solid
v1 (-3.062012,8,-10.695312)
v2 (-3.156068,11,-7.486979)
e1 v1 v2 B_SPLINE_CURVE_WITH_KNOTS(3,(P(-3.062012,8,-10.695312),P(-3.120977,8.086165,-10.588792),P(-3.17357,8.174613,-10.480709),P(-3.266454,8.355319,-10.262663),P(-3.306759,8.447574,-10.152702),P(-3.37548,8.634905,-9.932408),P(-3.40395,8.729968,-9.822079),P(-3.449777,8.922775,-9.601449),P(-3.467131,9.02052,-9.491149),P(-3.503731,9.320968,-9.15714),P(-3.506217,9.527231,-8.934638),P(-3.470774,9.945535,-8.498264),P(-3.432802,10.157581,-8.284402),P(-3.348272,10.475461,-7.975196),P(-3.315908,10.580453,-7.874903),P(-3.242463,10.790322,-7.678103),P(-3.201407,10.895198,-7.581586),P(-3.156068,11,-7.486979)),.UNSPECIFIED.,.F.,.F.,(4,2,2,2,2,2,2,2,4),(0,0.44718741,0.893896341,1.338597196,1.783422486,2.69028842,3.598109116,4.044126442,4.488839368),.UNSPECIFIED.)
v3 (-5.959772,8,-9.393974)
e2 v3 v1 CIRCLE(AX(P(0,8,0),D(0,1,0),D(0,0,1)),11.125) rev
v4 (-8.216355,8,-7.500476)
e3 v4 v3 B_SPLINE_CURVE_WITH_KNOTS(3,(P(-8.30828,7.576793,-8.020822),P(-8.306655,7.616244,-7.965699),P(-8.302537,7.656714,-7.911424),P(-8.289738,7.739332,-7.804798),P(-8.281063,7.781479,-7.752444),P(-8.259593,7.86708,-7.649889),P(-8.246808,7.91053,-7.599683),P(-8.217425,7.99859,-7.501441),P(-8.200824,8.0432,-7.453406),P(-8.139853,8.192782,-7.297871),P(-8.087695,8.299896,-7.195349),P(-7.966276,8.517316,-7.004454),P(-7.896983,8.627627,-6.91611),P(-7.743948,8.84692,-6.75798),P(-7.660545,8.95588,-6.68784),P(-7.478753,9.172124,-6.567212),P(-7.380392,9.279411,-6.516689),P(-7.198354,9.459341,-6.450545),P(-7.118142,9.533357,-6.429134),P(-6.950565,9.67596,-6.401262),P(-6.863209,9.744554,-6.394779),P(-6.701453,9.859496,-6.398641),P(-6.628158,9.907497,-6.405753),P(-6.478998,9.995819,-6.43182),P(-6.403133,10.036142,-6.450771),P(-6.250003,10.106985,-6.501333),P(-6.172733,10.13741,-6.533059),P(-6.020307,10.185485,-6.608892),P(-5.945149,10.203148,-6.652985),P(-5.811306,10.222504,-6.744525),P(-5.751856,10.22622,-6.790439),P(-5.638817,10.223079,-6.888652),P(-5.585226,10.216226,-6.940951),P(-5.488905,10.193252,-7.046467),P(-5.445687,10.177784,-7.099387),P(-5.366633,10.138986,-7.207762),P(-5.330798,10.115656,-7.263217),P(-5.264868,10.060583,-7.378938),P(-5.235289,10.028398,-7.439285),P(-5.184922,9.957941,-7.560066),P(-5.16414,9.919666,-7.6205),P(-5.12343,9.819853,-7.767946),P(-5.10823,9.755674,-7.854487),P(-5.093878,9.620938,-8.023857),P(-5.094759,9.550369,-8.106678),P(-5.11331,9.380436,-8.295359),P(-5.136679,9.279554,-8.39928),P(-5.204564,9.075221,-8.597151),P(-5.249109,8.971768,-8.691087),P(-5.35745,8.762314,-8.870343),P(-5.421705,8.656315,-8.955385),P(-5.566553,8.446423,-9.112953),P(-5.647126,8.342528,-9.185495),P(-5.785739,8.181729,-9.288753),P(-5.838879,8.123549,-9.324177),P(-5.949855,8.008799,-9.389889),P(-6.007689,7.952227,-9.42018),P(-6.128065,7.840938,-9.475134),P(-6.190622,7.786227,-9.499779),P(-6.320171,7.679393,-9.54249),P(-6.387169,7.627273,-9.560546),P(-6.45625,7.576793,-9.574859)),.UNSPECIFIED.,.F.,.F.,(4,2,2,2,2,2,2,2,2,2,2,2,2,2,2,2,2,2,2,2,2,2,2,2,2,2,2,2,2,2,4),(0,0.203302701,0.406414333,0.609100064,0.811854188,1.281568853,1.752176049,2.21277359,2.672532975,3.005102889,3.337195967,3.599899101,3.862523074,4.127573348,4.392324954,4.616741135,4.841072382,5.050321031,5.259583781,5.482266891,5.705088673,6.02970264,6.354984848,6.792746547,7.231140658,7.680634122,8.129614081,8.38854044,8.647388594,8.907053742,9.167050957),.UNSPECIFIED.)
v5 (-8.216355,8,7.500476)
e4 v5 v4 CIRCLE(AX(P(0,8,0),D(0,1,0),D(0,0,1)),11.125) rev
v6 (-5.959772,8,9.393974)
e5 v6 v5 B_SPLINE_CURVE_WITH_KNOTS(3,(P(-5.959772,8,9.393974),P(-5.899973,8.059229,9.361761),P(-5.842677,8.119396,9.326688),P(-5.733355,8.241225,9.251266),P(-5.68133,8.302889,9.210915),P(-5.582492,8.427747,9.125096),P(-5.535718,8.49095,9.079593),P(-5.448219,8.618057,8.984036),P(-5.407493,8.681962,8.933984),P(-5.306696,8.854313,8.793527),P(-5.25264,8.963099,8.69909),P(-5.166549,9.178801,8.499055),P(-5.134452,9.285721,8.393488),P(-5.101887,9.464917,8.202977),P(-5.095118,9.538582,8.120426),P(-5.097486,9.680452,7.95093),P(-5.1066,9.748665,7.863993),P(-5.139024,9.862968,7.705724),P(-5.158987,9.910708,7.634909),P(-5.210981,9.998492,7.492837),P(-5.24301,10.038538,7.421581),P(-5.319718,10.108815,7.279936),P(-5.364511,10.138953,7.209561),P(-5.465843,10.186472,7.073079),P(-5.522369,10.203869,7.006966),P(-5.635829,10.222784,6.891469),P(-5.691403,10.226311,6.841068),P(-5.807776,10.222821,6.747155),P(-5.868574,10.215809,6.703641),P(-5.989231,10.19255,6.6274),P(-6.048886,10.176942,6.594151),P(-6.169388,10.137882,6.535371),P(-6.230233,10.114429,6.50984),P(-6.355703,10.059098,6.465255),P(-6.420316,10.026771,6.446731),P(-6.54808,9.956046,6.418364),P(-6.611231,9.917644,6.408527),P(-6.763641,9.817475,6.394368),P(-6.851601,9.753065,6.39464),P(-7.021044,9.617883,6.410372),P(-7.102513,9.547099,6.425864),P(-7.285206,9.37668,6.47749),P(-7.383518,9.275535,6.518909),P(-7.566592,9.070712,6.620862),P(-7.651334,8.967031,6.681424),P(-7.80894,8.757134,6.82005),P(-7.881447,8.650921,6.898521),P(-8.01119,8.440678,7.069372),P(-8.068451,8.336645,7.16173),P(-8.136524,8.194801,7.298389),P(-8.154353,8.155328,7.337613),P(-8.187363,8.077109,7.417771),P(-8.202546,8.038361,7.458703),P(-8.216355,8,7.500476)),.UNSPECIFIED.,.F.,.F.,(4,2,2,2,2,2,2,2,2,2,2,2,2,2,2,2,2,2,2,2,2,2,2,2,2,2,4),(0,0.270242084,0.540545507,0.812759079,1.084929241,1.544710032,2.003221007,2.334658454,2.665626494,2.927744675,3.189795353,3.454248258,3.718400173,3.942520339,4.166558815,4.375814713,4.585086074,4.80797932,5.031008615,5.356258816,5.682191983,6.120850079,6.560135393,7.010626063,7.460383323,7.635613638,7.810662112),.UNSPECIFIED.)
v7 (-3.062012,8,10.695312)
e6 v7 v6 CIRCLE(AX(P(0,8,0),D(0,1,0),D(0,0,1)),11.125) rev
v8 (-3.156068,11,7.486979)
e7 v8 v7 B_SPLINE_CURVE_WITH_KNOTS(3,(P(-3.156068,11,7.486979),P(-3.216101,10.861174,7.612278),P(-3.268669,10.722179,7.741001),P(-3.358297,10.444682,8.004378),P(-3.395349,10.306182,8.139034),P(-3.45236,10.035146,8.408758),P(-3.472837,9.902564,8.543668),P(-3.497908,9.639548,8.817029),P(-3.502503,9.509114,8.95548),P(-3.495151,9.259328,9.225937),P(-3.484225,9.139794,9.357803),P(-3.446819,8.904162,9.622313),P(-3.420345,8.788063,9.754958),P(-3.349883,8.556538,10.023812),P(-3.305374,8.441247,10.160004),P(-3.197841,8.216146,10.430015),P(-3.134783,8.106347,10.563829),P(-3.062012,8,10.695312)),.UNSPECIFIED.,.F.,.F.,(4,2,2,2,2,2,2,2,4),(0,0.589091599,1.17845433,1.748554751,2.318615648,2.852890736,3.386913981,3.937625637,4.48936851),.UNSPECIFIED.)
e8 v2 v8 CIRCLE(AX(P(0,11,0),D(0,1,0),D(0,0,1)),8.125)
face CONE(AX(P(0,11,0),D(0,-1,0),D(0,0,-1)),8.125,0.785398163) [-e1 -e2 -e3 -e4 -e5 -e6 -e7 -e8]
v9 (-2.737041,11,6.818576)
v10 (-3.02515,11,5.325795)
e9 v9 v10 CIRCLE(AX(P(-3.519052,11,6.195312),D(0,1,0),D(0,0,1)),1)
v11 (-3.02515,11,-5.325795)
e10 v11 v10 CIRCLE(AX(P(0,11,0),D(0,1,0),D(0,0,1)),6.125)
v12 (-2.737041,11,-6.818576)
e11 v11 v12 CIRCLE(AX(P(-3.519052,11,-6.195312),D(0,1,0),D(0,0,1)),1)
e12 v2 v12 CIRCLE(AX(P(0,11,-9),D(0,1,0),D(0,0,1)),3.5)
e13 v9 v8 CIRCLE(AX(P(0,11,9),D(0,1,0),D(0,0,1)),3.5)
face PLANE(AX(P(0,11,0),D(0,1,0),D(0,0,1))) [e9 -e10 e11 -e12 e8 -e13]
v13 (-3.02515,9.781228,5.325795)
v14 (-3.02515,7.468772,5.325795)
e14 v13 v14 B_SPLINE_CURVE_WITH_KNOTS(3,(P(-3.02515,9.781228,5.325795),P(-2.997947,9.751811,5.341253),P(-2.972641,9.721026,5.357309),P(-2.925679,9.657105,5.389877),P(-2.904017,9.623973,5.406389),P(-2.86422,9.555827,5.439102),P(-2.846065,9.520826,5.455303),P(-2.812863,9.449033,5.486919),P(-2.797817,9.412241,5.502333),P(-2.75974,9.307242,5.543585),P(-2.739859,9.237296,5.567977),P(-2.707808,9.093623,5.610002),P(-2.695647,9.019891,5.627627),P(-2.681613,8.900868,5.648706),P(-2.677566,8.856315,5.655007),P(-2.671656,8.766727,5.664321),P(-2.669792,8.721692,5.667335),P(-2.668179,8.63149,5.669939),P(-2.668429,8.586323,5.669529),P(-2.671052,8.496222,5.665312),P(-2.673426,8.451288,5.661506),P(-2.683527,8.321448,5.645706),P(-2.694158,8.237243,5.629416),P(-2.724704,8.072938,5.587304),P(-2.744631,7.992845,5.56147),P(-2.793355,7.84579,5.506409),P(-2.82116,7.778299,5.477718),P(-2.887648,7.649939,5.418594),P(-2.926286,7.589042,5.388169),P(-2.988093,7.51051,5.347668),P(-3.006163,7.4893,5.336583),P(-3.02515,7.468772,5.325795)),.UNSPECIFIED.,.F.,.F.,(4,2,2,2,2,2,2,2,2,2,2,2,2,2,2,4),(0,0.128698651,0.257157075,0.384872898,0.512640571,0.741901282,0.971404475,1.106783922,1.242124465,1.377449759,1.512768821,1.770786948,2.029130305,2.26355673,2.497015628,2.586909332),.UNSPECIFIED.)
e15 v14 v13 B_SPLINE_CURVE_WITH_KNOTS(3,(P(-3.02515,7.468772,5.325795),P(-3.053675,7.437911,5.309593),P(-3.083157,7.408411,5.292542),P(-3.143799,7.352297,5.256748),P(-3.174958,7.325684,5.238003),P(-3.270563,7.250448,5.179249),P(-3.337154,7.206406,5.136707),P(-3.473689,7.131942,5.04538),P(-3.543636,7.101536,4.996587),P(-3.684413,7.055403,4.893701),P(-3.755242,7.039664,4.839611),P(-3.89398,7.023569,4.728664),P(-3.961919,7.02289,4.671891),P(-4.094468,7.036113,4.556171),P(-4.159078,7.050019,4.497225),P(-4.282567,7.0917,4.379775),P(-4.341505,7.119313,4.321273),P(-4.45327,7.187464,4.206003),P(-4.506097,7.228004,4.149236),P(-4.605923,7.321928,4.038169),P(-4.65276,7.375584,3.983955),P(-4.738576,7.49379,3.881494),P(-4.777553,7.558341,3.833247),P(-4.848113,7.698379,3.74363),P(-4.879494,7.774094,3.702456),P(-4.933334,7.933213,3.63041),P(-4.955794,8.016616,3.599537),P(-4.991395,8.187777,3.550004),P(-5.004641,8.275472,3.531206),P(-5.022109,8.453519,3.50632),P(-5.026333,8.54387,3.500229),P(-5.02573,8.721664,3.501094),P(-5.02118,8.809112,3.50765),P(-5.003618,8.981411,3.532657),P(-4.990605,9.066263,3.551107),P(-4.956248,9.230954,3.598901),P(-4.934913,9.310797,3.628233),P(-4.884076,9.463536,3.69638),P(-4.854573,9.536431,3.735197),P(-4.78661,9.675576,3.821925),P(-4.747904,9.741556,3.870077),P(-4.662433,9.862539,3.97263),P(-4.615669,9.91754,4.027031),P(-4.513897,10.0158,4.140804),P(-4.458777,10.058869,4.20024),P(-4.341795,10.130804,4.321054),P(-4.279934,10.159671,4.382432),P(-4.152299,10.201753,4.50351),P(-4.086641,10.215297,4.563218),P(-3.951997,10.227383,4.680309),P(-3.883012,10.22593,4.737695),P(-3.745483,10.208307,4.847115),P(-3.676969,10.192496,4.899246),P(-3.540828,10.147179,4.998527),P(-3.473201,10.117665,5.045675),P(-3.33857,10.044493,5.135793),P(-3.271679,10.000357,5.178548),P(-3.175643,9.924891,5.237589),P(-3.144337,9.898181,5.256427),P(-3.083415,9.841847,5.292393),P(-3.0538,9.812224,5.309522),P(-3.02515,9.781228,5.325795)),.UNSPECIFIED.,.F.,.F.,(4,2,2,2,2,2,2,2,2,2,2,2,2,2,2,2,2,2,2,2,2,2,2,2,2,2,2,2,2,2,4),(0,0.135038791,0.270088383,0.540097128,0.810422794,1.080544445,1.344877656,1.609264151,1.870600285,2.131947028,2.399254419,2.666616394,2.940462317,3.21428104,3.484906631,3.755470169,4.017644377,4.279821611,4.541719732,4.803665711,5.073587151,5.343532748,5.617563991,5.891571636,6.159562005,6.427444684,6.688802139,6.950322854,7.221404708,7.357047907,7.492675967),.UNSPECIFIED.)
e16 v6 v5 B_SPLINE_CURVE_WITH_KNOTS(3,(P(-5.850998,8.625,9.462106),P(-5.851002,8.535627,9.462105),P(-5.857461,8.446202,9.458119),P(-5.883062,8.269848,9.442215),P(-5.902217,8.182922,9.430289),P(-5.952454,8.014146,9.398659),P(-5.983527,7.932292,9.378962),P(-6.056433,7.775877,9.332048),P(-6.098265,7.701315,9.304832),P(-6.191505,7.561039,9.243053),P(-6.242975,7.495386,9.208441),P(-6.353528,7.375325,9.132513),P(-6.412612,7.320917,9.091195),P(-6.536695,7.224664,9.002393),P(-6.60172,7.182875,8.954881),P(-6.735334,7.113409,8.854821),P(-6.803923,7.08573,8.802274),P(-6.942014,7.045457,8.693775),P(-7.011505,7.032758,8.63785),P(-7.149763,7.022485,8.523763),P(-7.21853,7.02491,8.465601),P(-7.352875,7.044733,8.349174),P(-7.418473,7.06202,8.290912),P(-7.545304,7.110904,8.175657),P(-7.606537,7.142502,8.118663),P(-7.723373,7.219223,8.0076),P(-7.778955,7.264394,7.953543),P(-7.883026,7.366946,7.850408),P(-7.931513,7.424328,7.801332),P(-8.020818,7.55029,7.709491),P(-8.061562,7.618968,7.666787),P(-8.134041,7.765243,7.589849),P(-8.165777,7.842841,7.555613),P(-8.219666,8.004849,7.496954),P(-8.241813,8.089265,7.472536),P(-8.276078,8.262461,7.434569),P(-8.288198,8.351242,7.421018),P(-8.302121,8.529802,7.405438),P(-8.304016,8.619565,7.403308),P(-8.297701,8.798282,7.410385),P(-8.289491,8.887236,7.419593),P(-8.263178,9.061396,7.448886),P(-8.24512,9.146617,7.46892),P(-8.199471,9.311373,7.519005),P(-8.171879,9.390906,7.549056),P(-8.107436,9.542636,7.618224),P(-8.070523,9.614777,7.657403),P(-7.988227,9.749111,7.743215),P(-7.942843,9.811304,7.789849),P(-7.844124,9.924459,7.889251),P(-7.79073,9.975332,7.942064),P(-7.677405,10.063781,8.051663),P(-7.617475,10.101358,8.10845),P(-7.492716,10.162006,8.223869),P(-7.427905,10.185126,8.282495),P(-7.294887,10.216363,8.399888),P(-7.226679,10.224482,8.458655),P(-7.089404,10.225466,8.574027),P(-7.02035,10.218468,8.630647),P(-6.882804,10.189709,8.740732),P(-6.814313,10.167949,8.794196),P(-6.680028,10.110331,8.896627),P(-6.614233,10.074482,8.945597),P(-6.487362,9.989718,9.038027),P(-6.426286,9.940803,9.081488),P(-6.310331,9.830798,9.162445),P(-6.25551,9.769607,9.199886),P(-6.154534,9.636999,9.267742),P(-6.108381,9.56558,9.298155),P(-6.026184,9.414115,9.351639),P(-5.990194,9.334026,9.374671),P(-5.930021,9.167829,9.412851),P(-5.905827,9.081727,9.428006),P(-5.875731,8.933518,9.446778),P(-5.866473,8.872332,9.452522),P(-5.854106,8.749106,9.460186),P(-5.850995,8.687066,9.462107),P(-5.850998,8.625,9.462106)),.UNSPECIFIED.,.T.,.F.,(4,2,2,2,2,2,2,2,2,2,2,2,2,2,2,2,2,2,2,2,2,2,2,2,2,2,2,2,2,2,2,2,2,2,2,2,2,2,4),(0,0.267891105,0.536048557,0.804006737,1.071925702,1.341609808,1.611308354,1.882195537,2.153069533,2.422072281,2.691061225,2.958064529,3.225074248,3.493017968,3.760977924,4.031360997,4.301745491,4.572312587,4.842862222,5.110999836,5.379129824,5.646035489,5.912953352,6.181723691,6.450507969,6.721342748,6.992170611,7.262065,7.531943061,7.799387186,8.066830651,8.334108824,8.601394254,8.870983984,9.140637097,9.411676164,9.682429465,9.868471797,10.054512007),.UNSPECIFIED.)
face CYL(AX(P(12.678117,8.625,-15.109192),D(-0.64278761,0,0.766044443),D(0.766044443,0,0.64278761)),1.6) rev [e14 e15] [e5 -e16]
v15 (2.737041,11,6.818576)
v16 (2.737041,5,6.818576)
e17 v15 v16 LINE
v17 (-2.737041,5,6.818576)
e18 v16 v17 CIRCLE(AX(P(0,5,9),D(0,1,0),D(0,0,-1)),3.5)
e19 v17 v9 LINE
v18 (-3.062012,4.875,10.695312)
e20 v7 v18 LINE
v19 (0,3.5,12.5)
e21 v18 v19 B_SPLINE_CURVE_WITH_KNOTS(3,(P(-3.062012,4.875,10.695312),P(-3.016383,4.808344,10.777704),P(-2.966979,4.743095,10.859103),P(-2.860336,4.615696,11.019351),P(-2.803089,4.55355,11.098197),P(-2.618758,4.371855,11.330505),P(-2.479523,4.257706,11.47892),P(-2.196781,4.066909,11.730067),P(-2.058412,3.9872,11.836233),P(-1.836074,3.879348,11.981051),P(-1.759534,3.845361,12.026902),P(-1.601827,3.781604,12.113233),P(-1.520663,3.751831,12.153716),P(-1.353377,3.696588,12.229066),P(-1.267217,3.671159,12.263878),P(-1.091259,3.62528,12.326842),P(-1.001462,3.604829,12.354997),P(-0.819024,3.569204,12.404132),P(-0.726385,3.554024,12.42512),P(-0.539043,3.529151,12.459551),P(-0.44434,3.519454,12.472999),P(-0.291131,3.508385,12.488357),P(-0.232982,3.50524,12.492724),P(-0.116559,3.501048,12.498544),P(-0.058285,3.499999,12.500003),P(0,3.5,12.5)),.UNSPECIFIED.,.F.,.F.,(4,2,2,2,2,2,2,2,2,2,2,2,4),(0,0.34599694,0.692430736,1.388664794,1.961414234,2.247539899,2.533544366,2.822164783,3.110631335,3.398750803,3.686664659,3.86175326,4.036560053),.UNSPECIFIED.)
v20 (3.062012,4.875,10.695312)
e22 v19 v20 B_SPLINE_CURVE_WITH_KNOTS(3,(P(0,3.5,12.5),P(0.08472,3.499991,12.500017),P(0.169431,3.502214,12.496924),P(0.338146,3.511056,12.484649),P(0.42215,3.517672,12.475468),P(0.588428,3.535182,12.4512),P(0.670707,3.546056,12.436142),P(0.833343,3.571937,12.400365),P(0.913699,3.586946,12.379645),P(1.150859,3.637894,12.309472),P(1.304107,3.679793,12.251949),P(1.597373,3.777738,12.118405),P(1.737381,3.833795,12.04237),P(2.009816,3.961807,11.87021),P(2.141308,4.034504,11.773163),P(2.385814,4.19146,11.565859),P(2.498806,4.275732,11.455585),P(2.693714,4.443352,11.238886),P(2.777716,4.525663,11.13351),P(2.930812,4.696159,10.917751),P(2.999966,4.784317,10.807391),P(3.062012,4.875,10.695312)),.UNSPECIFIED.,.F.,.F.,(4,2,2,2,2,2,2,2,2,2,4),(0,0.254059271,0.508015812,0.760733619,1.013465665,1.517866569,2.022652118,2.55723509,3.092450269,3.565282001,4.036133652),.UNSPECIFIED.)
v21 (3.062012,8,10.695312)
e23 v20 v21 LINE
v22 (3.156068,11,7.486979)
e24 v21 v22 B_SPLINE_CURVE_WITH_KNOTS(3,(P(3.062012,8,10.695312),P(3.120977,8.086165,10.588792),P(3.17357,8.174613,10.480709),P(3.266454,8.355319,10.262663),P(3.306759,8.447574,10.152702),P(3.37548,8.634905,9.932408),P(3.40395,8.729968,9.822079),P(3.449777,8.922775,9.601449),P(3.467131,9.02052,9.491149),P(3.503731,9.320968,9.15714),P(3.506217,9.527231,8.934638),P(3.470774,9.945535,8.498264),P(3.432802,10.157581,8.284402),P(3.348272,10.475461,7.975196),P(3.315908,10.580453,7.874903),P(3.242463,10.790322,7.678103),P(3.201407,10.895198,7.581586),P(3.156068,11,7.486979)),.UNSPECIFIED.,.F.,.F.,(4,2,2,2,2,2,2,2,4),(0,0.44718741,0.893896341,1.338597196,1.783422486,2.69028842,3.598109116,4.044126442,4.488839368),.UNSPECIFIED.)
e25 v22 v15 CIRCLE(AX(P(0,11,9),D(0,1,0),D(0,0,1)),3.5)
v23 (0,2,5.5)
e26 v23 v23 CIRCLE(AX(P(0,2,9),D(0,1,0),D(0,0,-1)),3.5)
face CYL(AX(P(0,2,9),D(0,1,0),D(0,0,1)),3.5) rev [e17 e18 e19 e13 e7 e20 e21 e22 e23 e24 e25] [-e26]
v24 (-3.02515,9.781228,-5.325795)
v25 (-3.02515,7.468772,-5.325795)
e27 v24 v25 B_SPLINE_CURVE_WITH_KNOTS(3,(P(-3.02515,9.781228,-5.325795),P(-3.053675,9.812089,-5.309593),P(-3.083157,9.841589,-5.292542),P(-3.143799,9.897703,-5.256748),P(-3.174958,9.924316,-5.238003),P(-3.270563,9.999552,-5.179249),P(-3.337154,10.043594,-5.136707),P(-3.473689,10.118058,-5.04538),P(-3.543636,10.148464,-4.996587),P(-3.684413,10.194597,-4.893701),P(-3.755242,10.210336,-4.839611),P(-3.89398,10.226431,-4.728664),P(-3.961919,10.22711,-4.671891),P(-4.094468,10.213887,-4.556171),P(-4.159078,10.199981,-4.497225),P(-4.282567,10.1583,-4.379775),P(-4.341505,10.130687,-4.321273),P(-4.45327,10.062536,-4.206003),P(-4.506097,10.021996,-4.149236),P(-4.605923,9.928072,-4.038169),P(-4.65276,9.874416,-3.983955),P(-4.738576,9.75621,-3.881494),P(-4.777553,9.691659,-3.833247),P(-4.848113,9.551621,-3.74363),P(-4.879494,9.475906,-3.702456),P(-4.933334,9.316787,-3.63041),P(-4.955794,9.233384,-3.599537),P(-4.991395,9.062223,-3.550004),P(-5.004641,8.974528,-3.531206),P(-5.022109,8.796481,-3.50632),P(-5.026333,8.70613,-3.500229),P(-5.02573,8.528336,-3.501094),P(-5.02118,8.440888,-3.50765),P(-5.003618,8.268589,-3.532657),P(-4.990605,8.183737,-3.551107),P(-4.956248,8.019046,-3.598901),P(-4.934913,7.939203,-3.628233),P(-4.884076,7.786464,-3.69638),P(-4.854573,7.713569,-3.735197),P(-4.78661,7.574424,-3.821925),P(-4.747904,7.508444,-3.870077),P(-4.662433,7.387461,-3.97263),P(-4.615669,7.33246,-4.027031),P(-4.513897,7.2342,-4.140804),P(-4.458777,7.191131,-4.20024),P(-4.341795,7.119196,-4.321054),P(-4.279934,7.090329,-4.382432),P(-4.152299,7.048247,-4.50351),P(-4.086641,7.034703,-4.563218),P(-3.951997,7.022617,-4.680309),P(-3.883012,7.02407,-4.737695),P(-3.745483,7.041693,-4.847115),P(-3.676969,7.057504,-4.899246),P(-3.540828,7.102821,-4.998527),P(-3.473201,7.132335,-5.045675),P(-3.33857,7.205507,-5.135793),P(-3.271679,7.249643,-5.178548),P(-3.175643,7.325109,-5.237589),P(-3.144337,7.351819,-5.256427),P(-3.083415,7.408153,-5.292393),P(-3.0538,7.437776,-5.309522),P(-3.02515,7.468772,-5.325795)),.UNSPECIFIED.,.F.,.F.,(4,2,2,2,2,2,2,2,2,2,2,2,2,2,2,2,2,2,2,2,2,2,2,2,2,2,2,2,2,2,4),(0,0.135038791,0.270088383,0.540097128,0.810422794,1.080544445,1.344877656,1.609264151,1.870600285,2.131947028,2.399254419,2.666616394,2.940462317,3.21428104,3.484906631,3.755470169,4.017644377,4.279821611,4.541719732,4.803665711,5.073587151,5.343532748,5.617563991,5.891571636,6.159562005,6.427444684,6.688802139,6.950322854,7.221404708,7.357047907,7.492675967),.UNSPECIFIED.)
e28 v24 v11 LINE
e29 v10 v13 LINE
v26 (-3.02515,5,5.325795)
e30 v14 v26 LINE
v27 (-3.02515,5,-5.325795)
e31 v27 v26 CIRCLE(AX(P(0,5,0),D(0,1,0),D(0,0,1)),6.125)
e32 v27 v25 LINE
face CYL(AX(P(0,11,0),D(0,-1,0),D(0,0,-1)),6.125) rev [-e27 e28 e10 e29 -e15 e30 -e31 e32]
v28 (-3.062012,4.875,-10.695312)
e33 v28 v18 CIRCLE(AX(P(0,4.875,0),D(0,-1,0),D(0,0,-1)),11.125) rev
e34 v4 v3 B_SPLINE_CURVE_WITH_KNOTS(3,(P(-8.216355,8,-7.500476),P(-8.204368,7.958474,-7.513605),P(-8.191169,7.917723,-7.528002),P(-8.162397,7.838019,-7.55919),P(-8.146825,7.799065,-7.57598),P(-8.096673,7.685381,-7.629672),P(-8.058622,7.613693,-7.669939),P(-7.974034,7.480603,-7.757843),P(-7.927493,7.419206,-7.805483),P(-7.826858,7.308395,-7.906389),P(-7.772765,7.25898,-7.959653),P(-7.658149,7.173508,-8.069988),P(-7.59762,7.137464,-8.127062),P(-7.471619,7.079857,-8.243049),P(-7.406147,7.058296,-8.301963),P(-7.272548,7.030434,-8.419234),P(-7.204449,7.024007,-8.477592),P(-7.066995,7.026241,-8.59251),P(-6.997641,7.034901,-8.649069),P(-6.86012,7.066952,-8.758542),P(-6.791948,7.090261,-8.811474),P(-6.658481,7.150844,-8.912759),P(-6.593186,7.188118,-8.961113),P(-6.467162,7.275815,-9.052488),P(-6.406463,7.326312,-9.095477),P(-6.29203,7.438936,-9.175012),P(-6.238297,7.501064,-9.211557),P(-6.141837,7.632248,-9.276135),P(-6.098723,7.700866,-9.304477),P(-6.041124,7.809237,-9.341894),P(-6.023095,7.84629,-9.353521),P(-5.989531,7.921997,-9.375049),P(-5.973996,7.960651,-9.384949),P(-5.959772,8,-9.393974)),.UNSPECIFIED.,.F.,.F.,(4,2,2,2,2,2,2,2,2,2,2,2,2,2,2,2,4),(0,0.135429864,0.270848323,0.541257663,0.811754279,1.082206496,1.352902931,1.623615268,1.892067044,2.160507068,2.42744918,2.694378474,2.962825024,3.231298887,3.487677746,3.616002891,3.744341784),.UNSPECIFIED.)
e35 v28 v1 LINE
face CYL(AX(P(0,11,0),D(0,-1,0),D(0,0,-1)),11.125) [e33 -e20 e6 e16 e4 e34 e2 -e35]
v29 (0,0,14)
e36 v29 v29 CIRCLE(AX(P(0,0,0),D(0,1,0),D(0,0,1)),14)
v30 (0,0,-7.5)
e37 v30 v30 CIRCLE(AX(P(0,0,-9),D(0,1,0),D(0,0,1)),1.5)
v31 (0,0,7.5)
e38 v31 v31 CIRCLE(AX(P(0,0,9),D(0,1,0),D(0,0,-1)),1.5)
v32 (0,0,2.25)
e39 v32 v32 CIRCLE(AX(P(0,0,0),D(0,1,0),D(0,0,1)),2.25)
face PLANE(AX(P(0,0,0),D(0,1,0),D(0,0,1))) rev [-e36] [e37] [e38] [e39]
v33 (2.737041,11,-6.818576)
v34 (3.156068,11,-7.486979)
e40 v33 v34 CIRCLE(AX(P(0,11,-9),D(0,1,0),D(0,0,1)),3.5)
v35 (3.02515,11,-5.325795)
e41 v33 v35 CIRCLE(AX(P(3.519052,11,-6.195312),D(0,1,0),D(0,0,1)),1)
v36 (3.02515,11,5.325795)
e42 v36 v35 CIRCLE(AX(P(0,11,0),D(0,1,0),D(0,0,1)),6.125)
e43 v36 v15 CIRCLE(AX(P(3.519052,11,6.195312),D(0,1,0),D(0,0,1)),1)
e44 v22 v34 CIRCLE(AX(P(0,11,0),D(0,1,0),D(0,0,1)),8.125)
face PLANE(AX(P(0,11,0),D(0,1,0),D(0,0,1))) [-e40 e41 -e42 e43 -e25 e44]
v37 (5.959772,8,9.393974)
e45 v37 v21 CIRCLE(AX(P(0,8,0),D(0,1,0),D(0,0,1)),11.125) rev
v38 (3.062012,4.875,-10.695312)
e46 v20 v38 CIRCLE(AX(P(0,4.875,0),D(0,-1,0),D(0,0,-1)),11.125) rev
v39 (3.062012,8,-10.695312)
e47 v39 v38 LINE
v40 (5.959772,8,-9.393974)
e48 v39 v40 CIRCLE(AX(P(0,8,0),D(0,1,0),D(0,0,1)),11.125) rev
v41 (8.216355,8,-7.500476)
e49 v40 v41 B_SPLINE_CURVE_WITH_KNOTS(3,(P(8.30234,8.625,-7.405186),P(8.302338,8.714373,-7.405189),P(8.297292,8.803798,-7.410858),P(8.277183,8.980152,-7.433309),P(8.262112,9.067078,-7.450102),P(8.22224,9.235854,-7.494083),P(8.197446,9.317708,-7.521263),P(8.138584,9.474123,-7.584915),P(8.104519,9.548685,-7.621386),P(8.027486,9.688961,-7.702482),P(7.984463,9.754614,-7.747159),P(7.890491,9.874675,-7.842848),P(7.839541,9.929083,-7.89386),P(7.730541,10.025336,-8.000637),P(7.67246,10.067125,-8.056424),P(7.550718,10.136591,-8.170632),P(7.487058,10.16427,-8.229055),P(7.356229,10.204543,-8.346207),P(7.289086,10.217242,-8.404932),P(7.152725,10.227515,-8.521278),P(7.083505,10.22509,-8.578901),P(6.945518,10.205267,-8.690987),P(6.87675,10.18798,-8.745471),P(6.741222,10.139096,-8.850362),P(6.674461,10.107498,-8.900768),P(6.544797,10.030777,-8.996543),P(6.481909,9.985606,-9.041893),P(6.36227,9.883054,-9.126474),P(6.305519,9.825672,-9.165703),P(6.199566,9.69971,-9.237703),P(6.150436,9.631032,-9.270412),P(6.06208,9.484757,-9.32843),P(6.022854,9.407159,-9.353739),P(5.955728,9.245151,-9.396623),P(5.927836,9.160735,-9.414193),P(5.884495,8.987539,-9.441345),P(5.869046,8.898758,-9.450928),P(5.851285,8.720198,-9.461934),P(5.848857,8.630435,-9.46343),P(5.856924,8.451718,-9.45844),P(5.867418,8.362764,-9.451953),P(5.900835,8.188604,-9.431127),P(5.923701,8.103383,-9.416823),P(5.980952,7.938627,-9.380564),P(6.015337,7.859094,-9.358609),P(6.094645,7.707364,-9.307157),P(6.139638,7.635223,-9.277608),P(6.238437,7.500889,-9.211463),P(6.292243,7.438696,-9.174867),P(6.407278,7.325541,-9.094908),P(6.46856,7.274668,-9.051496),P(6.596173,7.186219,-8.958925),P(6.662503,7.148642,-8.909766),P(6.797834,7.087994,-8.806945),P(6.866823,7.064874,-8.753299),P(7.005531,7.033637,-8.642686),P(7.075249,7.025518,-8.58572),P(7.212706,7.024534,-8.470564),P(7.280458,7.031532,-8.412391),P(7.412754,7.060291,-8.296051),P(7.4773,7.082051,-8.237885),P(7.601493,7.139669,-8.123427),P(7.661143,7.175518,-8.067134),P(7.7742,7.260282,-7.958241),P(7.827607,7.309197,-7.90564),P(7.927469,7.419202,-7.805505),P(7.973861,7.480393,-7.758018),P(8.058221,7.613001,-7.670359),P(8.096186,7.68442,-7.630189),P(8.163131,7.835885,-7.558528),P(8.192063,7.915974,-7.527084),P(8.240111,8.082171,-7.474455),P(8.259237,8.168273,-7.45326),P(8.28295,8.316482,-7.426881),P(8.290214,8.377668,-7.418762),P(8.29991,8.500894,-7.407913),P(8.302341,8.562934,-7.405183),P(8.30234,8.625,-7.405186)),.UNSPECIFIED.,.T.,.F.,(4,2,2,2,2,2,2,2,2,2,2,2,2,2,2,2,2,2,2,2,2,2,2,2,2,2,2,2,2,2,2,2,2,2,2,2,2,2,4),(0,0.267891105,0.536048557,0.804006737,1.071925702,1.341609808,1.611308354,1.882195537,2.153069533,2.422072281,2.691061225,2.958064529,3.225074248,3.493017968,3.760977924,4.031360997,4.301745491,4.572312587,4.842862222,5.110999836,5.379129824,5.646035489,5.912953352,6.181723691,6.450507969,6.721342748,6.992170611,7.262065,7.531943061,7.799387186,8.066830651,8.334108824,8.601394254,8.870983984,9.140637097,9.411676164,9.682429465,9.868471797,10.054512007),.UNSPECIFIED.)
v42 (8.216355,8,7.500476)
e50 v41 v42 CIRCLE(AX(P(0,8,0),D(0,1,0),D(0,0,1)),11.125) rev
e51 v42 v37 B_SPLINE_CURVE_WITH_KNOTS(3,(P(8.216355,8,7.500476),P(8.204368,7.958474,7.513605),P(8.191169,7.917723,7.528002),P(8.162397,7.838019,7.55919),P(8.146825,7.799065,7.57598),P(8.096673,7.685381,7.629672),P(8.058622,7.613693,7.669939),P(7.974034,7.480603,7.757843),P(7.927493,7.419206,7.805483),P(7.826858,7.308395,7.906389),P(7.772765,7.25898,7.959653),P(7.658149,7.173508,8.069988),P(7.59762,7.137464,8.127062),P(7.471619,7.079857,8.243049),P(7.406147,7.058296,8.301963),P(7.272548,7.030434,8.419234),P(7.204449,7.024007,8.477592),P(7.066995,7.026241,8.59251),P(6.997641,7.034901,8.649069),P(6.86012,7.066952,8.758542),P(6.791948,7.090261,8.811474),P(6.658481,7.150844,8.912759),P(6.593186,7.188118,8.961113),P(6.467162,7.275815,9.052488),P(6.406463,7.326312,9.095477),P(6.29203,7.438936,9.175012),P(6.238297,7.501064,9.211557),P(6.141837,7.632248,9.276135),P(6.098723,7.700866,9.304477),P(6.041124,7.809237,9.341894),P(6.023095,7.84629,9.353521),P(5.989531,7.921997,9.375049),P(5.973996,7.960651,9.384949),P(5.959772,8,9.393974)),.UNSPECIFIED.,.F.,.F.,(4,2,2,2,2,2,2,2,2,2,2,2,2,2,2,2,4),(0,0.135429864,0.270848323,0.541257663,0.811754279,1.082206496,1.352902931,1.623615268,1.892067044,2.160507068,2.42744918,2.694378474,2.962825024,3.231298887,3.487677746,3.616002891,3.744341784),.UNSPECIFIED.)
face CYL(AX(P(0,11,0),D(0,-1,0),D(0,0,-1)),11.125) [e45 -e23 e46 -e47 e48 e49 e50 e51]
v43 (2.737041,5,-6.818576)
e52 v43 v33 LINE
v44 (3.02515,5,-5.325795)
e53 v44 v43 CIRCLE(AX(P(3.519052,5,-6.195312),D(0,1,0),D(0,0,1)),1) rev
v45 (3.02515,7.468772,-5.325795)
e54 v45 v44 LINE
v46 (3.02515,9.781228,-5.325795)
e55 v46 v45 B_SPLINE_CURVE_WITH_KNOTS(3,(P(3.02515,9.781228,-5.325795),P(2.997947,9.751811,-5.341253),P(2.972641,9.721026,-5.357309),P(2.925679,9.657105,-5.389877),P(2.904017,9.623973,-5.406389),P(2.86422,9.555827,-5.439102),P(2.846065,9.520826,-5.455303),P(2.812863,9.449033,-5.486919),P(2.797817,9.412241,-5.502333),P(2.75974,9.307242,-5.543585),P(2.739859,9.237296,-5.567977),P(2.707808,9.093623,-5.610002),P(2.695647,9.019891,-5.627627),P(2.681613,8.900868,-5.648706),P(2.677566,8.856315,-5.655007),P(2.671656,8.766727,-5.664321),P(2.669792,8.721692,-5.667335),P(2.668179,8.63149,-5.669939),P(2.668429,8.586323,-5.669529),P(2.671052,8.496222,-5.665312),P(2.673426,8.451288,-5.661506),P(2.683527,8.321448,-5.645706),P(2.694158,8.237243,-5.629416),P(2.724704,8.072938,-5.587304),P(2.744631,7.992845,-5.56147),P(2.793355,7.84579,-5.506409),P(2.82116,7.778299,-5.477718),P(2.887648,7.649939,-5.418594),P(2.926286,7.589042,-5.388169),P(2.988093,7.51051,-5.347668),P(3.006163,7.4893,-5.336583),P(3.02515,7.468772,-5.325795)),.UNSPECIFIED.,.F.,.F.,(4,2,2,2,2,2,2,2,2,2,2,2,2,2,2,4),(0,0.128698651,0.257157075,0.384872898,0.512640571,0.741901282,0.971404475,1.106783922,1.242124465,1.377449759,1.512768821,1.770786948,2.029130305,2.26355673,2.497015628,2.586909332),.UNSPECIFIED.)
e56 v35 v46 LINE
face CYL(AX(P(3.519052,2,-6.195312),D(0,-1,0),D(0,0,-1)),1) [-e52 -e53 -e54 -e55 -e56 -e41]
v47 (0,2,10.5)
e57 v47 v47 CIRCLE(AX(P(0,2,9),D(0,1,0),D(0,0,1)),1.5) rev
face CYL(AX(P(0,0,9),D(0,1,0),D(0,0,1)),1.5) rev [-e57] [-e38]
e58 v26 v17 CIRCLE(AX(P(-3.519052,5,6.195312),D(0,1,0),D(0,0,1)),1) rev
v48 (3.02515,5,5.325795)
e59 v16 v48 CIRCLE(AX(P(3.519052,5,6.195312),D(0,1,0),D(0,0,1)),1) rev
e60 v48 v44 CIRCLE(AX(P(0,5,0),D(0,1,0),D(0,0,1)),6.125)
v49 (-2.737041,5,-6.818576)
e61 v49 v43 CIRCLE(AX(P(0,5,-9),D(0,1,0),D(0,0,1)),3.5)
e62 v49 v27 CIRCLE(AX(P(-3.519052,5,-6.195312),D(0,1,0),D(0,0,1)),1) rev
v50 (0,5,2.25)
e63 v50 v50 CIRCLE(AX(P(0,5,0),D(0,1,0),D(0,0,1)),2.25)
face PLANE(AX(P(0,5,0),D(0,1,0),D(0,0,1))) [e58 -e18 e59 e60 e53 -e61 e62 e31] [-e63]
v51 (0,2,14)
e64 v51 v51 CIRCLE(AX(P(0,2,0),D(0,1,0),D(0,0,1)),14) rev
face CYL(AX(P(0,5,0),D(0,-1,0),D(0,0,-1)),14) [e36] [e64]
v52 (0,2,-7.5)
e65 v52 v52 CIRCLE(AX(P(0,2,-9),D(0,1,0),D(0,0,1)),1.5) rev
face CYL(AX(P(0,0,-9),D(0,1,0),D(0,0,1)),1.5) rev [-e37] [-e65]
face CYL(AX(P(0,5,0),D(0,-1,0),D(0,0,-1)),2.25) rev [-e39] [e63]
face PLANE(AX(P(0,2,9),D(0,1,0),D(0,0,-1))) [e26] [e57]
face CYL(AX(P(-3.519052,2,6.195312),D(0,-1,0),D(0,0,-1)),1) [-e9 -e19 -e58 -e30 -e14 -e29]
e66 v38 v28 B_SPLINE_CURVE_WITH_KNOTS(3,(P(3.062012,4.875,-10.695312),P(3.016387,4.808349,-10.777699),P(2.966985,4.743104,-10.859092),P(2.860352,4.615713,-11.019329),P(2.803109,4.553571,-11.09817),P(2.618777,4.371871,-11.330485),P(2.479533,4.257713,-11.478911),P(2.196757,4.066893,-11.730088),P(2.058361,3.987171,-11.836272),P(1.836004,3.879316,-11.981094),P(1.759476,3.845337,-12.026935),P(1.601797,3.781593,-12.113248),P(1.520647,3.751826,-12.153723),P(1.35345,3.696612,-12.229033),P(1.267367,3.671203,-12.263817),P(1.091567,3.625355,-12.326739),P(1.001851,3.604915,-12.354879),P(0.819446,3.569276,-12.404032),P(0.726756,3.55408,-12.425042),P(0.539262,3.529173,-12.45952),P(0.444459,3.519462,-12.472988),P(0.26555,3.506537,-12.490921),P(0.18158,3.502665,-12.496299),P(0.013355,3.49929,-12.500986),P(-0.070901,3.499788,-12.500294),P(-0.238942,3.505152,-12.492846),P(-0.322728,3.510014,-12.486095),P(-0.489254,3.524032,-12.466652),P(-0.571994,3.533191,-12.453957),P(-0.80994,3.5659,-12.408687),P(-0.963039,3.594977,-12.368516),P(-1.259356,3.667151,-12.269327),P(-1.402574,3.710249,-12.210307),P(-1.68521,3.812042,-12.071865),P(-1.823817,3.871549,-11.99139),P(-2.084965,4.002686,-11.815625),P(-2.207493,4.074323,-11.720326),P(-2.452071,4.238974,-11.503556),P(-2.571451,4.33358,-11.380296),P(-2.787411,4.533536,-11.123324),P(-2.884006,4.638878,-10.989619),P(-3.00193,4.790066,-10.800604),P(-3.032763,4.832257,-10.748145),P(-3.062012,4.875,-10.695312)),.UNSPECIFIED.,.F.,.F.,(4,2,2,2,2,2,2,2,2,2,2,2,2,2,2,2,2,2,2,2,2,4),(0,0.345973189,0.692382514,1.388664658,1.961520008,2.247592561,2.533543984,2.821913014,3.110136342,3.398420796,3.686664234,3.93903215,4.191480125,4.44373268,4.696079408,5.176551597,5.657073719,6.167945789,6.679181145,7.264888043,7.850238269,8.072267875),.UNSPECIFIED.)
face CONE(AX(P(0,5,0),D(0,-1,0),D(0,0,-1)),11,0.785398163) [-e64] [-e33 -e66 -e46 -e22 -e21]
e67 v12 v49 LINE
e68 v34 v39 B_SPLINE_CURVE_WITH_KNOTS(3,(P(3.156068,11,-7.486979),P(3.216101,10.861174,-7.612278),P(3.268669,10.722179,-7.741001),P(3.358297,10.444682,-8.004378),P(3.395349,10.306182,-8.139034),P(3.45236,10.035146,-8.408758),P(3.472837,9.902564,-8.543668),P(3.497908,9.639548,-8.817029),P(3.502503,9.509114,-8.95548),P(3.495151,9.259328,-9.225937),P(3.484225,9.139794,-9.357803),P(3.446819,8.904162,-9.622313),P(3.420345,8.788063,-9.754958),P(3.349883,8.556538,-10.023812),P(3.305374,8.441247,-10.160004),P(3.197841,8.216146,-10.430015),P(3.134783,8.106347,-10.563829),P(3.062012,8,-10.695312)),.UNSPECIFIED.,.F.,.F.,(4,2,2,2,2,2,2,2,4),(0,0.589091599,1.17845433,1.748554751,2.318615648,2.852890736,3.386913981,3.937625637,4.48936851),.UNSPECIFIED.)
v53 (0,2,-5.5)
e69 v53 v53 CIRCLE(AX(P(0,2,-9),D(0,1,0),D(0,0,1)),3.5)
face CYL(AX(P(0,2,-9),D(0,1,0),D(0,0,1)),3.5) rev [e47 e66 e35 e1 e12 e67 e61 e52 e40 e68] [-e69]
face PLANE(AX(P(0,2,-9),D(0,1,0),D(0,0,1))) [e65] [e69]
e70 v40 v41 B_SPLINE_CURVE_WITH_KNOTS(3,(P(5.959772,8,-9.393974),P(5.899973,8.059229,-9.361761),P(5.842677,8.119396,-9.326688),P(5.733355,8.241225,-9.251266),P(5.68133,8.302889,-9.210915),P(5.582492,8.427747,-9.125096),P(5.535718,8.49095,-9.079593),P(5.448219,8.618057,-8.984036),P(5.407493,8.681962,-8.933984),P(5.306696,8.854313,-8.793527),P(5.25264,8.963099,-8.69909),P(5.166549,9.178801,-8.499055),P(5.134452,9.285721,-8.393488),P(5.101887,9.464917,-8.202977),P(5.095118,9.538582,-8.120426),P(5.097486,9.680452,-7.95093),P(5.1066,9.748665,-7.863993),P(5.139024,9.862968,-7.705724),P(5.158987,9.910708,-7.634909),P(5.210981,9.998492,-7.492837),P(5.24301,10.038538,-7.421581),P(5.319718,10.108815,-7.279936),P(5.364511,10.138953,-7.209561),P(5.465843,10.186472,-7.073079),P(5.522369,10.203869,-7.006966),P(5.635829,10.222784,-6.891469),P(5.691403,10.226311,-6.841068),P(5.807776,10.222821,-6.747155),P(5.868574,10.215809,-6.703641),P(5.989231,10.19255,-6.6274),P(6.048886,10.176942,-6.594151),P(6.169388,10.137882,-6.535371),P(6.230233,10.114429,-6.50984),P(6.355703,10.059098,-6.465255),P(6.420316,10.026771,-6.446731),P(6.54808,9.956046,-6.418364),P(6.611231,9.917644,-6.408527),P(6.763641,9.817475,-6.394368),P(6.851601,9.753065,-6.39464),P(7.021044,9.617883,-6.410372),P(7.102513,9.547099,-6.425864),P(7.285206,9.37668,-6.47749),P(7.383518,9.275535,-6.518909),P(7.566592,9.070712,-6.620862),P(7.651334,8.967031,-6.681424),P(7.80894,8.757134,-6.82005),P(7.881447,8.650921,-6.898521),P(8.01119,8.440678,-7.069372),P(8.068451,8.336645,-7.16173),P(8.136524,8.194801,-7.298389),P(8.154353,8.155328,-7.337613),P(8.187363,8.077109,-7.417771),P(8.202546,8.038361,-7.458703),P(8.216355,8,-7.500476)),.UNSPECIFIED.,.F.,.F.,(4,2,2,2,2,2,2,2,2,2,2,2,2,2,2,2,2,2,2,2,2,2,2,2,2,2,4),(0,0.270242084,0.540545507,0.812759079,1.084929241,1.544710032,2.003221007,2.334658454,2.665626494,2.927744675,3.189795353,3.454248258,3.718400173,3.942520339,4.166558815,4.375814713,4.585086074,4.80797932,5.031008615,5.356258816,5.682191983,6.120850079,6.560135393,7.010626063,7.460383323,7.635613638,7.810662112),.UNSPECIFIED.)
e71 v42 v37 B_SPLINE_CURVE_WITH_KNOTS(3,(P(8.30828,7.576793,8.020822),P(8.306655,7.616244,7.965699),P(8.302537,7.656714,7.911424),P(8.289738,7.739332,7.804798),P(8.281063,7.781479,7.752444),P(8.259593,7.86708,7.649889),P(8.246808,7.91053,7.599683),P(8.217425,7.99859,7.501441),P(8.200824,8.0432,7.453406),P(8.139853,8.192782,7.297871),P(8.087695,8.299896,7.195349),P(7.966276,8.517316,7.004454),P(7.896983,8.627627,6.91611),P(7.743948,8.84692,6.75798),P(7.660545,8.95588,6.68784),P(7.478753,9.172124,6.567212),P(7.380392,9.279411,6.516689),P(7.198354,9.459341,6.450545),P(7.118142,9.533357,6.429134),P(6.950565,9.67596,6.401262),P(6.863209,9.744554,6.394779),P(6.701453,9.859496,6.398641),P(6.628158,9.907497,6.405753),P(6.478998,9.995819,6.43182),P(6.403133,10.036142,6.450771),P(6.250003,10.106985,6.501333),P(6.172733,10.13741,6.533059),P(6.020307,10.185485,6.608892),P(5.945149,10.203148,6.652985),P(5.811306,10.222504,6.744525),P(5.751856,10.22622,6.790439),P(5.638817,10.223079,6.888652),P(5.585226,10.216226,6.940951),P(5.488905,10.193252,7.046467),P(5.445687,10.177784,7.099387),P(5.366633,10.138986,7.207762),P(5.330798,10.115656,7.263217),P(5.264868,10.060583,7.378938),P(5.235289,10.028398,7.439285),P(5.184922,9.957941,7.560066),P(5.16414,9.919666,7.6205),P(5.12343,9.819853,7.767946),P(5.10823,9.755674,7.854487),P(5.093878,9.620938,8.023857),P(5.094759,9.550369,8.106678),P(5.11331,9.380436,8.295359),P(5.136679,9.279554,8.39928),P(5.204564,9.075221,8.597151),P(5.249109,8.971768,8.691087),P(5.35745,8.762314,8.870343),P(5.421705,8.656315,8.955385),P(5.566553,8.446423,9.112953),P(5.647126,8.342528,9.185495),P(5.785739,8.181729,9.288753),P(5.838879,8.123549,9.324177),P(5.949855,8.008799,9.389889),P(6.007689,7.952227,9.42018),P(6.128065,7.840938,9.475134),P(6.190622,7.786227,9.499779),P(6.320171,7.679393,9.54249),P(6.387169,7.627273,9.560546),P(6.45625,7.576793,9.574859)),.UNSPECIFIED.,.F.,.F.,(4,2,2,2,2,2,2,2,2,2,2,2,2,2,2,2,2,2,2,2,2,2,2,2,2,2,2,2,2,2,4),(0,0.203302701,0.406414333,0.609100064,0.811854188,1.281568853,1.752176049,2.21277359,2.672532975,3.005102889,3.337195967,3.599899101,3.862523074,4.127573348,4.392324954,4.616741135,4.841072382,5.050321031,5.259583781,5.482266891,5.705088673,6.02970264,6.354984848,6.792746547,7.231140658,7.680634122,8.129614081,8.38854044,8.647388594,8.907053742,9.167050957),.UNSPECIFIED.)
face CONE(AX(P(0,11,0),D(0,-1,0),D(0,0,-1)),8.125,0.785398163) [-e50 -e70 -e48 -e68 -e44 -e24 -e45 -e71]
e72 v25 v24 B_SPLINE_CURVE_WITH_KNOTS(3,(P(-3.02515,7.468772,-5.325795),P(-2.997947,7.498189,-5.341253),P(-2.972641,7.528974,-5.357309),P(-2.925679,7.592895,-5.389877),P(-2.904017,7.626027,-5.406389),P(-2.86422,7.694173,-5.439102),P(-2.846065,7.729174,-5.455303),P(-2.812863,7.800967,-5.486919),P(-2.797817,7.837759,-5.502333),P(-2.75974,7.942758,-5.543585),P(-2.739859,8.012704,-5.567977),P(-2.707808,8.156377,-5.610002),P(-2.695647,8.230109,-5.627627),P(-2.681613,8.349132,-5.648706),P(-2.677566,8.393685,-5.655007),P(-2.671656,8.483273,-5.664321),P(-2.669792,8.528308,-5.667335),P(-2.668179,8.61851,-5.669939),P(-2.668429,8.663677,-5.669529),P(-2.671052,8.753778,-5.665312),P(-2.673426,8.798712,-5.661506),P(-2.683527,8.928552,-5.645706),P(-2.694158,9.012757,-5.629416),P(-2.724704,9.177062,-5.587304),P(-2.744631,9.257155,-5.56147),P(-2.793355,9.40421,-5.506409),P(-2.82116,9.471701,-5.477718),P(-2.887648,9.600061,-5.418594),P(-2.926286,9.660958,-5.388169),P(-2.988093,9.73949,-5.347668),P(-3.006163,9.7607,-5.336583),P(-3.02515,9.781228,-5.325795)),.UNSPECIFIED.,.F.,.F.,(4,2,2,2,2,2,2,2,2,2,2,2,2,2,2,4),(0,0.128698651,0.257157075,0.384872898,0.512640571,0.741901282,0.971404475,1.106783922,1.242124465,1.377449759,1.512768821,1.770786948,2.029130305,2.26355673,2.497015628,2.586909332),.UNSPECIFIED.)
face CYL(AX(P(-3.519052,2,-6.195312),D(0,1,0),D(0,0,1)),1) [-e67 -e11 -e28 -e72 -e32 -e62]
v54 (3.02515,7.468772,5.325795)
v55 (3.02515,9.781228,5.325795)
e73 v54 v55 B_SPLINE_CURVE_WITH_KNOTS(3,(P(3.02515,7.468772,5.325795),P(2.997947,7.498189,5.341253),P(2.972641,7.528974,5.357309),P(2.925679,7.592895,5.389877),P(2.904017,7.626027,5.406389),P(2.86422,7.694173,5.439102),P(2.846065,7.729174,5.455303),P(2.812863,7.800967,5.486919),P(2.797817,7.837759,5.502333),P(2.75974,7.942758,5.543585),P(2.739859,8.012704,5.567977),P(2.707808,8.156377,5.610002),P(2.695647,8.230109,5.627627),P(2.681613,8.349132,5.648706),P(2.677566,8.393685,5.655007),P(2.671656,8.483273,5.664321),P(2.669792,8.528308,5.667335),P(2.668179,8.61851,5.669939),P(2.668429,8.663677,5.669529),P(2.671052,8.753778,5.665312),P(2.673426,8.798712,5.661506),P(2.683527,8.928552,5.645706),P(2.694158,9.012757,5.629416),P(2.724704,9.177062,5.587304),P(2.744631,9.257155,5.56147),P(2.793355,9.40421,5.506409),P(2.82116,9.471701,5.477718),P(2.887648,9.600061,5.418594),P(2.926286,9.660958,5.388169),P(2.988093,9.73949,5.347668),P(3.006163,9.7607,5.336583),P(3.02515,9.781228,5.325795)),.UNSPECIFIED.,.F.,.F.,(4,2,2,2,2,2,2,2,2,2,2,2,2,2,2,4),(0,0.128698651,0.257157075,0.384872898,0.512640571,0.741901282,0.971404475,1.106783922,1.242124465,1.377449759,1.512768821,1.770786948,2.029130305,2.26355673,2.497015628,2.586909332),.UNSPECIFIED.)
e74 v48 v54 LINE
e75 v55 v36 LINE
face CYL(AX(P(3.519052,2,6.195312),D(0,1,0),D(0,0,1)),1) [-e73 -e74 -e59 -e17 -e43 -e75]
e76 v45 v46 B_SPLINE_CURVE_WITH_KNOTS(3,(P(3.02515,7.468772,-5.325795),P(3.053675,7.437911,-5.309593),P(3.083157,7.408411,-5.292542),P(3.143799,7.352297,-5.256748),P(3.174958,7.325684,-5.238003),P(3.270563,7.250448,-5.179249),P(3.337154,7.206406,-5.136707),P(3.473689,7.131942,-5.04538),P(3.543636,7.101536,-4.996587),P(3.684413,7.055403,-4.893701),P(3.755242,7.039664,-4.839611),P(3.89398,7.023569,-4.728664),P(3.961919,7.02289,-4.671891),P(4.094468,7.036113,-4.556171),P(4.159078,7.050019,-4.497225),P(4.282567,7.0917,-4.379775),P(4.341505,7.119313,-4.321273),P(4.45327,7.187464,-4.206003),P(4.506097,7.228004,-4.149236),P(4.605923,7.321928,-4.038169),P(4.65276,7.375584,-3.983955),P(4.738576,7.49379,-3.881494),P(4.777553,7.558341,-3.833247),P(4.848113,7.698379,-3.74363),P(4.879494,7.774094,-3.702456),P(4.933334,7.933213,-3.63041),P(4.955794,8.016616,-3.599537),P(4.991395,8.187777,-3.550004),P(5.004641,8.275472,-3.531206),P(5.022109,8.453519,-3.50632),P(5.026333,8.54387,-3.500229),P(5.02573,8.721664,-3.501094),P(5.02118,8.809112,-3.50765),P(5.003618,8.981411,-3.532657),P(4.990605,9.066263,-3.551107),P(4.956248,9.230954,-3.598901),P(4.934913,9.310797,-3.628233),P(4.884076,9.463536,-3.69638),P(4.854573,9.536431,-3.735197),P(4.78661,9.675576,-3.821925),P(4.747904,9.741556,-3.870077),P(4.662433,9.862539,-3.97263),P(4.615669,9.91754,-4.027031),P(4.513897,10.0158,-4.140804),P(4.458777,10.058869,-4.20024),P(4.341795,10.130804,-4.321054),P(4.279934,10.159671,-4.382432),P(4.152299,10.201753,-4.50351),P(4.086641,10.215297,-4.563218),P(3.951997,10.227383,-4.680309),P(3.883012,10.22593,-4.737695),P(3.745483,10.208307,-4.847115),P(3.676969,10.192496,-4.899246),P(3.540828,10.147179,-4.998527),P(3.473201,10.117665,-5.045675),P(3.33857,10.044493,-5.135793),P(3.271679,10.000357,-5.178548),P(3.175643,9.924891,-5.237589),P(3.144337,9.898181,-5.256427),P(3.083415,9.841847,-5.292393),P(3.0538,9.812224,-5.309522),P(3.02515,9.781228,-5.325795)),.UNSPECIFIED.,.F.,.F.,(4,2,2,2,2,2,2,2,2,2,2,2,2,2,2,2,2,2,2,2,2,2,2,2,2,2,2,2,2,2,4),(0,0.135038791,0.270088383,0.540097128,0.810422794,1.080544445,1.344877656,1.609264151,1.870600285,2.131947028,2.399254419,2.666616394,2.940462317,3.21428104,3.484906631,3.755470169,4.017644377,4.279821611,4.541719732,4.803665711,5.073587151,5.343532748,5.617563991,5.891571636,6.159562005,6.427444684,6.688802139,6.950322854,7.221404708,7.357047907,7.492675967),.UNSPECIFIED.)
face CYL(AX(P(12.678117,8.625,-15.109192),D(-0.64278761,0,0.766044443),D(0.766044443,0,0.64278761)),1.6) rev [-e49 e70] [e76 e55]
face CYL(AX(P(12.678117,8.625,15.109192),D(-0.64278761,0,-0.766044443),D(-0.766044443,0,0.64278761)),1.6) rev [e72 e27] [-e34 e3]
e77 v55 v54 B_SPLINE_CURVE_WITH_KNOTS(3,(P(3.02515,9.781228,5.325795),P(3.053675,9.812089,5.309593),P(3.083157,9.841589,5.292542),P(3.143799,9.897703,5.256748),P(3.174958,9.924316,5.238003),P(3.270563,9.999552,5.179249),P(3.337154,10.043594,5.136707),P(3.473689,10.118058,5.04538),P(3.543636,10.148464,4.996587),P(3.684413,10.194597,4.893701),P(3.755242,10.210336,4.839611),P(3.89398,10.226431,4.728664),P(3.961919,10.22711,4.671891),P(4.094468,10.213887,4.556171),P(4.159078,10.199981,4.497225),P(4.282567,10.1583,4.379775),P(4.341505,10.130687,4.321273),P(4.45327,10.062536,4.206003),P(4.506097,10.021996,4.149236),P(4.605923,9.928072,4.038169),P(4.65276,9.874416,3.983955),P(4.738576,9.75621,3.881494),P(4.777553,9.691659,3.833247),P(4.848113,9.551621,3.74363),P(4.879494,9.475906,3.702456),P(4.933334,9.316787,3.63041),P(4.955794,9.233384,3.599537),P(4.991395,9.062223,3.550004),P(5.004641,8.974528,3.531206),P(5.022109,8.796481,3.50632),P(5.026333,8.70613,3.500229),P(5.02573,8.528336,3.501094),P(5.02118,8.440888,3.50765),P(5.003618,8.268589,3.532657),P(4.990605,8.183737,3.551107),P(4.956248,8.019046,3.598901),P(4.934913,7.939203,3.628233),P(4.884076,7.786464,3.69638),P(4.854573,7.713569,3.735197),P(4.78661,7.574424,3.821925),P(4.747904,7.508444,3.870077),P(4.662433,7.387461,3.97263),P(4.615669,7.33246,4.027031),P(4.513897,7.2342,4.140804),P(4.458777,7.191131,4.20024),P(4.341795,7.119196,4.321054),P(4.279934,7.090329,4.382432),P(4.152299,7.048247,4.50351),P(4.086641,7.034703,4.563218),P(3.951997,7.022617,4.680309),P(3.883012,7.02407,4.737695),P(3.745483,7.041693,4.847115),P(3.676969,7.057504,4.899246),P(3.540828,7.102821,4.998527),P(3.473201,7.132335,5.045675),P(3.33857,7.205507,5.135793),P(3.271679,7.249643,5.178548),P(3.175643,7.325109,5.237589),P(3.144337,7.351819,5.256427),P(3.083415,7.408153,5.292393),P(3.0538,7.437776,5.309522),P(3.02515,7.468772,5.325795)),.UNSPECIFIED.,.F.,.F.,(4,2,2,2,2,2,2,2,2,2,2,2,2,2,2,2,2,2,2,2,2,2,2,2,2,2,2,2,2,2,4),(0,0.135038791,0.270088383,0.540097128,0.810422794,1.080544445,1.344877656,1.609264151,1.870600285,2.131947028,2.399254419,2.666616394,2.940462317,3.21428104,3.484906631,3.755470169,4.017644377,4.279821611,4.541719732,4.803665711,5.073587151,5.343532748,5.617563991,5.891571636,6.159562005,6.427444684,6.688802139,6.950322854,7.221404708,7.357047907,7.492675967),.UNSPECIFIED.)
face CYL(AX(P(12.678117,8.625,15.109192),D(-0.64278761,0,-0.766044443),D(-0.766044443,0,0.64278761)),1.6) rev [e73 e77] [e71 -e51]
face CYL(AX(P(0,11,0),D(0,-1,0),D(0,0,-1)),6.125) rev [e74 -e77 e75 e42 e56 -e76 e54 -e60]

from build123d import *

# Parameters (mm, degrees)
SKETCH1_R           = 14
SKETCH1_R_2         = 2.25
BOSS_EXTRUDE1_DEPTH = 5
SKETCH2_R           = 1.5
CUT_EXTRUDE1_DEPTH  = 21.420577857
SKETCH4_R           = 3.5
CUT_EXTRUDE2_DEPTH  = 3
CIRPATTERN1_COUNT   = 2
SKETCH5_R           = 11.125
SKETCH5_R_2         = 6.125
BOSS_EXTRUDE2_DEPTH = 6
SKETCH6_R           = 3.5
CUT_EXTRUDE3_DEPTH  = 21.688160866
CHAMFER1_SIZE       = 3
FILLET1_START       = 5
FILLET1_DEPTH       = 7
SKETCH8_R           = 1.6
CUT_EXTRUDE4_DEPTH  = 23.649503429
CHAMFER2_SIZE       = 3
CIRPATTERN2_COUNT   = 2
CIRPATTERN2_ANGLE   = 100


with BuildPart() as part:
    # Sketch1 → Boss-Extrude1 (new body)
    with BuildSketch(Plane(origin=(0, 0, 0), x_dir=(1, 0, 0), z_dir=(0, 1, 0))):
        with Locations(Location((0, 0, 0), (0, 0, 270))):
            Circle(SKETCH1_R)
        with Locations(Location((0, 0, 0), (0, 0, 270))):
            Circle(SKETCH1_R_2, mode=Mode.SUBTRACT)
    extrude(amount=BOSS_EXTRUDE1_DEPTH)

    # Sketch2 → Cut-Extrude1 (cut, through all)
    with BuildSketch(Plane(origin=(0, 5, 0), x_dir=(1, 0, 0), z_dir=(0, 1, 0))):
        with Locations(Location((0, 9, 0), (0, 0, 270))):
            Circle(SKETCH2_R)
    cut_extrude1 = extrude(amount=-CUT_EXTRUDE1_DEPTH, mode=Mode.SUBTRACT)

    # Sketch4 → Cut-Extrude2 (cut)
    with BuildSketch(Plane(origin=(0, 5, 0), x_dir=(1, 0, 0), z_dir=(0, 1, 0))):
        with Locations(Location((0, 9, 0), (0, 0, 270))):
            Circle(SKETCH4_R)
    cut_extrude2 = extrude(amount=-CUT_EXTRUDE2_DEPTH, mode=Mode.SUBTRACT)

    # CirPattern1: Cut-Extrude1, Cut-Extrude2 ×2 about axis
    cirpattern1_axis = Axis((0, 0, 0), (0, 1, 0))
    add([cut_extrude1.rotate(cirpattern1_axis, i * 360 / CIRPATTERN1_COUNT) for i in range(1, CIRPATTERN1_COUNT)], mode=Mode.SUBTRACT)
    add([cut_extrude2.rotate(cirpattern1_axis, i * 360 / CIRPATTERN1_COUNT) for i in range(1, CIRPATTERN1_COUNT)], mode=Mode.SUBTRACT)

    # Sketch5 → Boss-Extrude2 (add)
    with BuildSketch(Plane(origin=(0, 5, 0), x_dir=(1, 0, 0), z_dir=(0, 1, 0))):
        with Locations(Location((0, 0, 0), (0, 0, 74.023861397))):
            Circle(SKETCH5_R)
        with Locations(Location((0, 0, 0), (0, 0, 105.450591775))):
            Circle(SKETCH5_R_2, mode=Mode.SUBTRACT)
    extrude(amount=BOSS_EXTRUDE2_DEPTH)

    # Sketch6 → Cut-Extrude3 (cut, through all)
    with BuildSketch(Plane(origin=(0, 5, 0), x_dir=(1, 0, 0), z_dir=(0, 1, 0))):
        with Locations(Location((0, 9, 0), (0, 0, 270))):
            Circle(SKETCH6_R)
        with Locations(Location((0, -9, 0), (0, 0, 331.028467776))):
            Circle(SKETCH6_R)
    extrude(amount=CUT_EXTRUDE3_DEPTH, mode=Mode.SUBTRACT)

    # Chamfer1
    # the kernel refuses this chamfer: 3 mm, written as the material it takes off along each edge
    with BuildSketch(Plane(origin=(0, 5, 0), x_dir=(0, 0, 1), z_dir=(-1, 0, 0))) as chamfer1_piece_1_section:
        Polygon((14, -CHAMFER1_SIZE), (14 - CHAMFER1_SIZE, 0), (14, 0), align=None)
    chamfer1_piece_1 = revolve(axis=Axis((0, 5, 0), (0, 1, 0)), mode=Mode.PRIVATE)
    chamfer1_piece_1 = chamfer1_piece_1 - Plane(origin=(0, 5, 0), x_dir=(0.2752370049355325, 0, -0.9613764044920791), z_dir=(0, -1, 0)) * Cylinder(11.125, 56, mode=Mode.PRIVATE)
    add(chamfer1_piece_1, mode=Mode.SUBTRACT)

    # Fillet1: read off the stored shape, not the designer's step
    # Fillet1 outline → Fillet1 (cut)
    with BuildSketch(Plane(origin=(0, 0, 0), x_dir=(1, 0, 0), z_dir=(0, 1, 0)).offset(FILLET1_START)):
        with BuildLine():
            ThreePointArc((2.73704056, -6.818576389), (2.537172315, -6.005807905), (3.025150093, -5.325794956))
            ThreePointArc((3.025150093, -5.325794956), (2.346304597, -5.65778046), (1.631744733, -5.903645833))
            ThreePointArc((1.631744733, -5.903645833), (2.231780839, -6.303863081), (2.73704056, -6.818576389))
        make_face()
        with BuildLine():
            ThreePointArc((1.631744733, 5.903645833), (2.346304597, 5.65778046), (3.025150093, 5.325794956))
            ThreePointArc((3.025150093, 5.325794956), (2.537172315, 6.005807905), (2.73704056, 6.818576389))
            ThreePointArc((2.73704056, 6.818576389), (2.231780839, 6.303863081), (1.631744733, 5.903645833))
        make_face()
        with BuildLine():
            ThreePointArc((-2.73704056, -6.818576389), (-2.231780839, -6.303863081), (-1.631744733, -5.903645833))
            ThreePointArc((-1.631744733, -5.903645833), (-2.346304597, -5.65778046), (-3.025150093, -5.325794956))
            ThreePointArc((-3.025150093, -5.325794956), (-2.537172315, -6.005807905), (-2.73704056, -6.818576389))
        make_face()
        with BuildLine():
            ThreePointArc((-3.025150093, 5.325794956), (-2.346304597, 5.65778046), (-1.631744733, 5.903645833))
            ThreePointArc((-1.631744733, 5.903645833), (-2.231780839, 6.303863081), (-2.73704056, 6.818576389))
            ThreePointArc((-2.73704056, 6.818576389), (-2.537172315, 6.005807905), (-3.025150093, 5.325794956))
        make_face()
    extrude(amount=FILLET1_DEPTH, mode=Mode.SUBTRACT)

    # Sketch8 → Cut-Extrude4 (cut, symmetric)
    with BuildSketch(Plane(origin=(0, 0, 0), x_dir=(0, -1, 0), z_dir=(-0.6427876096865406, 0, 0.7660444431189771))):
        with Locations(Location((-8.625, 0, 0), (0, 0, 90))):
            Circle(SKETCH8_R)
    cut_extrude4 = extrude(amount=CUT_EXTRUDE4_DEPTH, both=True, mode=Mode.SUBTRACT)

    # Chamfer2
    # the kernel refuses this chamfer: 3 mm, written as the material it takes off along each edge
    with BuildSketch(Plane(origin=(0, 11, 0), x_dir=(-0.4035609850169031, 0, 0.9149527481636345), z_dir=(-0.9149527481636345, 0, -0.4035609850169031))) as chamfer2_piece_1:
        Polygon((11.125, -CHAMFER2_SIZE), (11.125 - CHAMFER2_SIZE, 0), (11.125, 0), align=None)
    revolve(axis=Axis((0, 11, 0), (0, 1, 0)), revolution_arc=227.60196489, mode=Mode.SUBTRACT)
    with BuildSketch(Plane(origin=(0, 11, 0), x_dir=(0.40356098501590637, 0, -0.914952748164074), z_dir=(0.914952748164074, 0, 0.40356098501590637))) as chamfer2_piece_2:
        Polygon((11.125, -CHAMFER2_SIZE), (11.125 - CHAMFER2_SIZE, 0), (11.125, 0), align=None)
    revolve(axis=Axis((0, 11, 0), (0, 1, 0)), revolution_arc=227.60196489, mode=Mode.SUBTRACT)

    # CirPattern2: Cut-Extrude4 ×2 about axis
    cirpattern2_axis = Axis((0, 5, 0), (0, -1, 0))
    for i in range(1, CIRPATTERN2_COUNT):
        add(cut_extrude4.rotate(cirpattern2_axis, i * CIRPATTERN2_ANGLE / (CIRPATTERN2_COUNT - 1)), mode=Mode.SUBTRACT)


solid = part.part
